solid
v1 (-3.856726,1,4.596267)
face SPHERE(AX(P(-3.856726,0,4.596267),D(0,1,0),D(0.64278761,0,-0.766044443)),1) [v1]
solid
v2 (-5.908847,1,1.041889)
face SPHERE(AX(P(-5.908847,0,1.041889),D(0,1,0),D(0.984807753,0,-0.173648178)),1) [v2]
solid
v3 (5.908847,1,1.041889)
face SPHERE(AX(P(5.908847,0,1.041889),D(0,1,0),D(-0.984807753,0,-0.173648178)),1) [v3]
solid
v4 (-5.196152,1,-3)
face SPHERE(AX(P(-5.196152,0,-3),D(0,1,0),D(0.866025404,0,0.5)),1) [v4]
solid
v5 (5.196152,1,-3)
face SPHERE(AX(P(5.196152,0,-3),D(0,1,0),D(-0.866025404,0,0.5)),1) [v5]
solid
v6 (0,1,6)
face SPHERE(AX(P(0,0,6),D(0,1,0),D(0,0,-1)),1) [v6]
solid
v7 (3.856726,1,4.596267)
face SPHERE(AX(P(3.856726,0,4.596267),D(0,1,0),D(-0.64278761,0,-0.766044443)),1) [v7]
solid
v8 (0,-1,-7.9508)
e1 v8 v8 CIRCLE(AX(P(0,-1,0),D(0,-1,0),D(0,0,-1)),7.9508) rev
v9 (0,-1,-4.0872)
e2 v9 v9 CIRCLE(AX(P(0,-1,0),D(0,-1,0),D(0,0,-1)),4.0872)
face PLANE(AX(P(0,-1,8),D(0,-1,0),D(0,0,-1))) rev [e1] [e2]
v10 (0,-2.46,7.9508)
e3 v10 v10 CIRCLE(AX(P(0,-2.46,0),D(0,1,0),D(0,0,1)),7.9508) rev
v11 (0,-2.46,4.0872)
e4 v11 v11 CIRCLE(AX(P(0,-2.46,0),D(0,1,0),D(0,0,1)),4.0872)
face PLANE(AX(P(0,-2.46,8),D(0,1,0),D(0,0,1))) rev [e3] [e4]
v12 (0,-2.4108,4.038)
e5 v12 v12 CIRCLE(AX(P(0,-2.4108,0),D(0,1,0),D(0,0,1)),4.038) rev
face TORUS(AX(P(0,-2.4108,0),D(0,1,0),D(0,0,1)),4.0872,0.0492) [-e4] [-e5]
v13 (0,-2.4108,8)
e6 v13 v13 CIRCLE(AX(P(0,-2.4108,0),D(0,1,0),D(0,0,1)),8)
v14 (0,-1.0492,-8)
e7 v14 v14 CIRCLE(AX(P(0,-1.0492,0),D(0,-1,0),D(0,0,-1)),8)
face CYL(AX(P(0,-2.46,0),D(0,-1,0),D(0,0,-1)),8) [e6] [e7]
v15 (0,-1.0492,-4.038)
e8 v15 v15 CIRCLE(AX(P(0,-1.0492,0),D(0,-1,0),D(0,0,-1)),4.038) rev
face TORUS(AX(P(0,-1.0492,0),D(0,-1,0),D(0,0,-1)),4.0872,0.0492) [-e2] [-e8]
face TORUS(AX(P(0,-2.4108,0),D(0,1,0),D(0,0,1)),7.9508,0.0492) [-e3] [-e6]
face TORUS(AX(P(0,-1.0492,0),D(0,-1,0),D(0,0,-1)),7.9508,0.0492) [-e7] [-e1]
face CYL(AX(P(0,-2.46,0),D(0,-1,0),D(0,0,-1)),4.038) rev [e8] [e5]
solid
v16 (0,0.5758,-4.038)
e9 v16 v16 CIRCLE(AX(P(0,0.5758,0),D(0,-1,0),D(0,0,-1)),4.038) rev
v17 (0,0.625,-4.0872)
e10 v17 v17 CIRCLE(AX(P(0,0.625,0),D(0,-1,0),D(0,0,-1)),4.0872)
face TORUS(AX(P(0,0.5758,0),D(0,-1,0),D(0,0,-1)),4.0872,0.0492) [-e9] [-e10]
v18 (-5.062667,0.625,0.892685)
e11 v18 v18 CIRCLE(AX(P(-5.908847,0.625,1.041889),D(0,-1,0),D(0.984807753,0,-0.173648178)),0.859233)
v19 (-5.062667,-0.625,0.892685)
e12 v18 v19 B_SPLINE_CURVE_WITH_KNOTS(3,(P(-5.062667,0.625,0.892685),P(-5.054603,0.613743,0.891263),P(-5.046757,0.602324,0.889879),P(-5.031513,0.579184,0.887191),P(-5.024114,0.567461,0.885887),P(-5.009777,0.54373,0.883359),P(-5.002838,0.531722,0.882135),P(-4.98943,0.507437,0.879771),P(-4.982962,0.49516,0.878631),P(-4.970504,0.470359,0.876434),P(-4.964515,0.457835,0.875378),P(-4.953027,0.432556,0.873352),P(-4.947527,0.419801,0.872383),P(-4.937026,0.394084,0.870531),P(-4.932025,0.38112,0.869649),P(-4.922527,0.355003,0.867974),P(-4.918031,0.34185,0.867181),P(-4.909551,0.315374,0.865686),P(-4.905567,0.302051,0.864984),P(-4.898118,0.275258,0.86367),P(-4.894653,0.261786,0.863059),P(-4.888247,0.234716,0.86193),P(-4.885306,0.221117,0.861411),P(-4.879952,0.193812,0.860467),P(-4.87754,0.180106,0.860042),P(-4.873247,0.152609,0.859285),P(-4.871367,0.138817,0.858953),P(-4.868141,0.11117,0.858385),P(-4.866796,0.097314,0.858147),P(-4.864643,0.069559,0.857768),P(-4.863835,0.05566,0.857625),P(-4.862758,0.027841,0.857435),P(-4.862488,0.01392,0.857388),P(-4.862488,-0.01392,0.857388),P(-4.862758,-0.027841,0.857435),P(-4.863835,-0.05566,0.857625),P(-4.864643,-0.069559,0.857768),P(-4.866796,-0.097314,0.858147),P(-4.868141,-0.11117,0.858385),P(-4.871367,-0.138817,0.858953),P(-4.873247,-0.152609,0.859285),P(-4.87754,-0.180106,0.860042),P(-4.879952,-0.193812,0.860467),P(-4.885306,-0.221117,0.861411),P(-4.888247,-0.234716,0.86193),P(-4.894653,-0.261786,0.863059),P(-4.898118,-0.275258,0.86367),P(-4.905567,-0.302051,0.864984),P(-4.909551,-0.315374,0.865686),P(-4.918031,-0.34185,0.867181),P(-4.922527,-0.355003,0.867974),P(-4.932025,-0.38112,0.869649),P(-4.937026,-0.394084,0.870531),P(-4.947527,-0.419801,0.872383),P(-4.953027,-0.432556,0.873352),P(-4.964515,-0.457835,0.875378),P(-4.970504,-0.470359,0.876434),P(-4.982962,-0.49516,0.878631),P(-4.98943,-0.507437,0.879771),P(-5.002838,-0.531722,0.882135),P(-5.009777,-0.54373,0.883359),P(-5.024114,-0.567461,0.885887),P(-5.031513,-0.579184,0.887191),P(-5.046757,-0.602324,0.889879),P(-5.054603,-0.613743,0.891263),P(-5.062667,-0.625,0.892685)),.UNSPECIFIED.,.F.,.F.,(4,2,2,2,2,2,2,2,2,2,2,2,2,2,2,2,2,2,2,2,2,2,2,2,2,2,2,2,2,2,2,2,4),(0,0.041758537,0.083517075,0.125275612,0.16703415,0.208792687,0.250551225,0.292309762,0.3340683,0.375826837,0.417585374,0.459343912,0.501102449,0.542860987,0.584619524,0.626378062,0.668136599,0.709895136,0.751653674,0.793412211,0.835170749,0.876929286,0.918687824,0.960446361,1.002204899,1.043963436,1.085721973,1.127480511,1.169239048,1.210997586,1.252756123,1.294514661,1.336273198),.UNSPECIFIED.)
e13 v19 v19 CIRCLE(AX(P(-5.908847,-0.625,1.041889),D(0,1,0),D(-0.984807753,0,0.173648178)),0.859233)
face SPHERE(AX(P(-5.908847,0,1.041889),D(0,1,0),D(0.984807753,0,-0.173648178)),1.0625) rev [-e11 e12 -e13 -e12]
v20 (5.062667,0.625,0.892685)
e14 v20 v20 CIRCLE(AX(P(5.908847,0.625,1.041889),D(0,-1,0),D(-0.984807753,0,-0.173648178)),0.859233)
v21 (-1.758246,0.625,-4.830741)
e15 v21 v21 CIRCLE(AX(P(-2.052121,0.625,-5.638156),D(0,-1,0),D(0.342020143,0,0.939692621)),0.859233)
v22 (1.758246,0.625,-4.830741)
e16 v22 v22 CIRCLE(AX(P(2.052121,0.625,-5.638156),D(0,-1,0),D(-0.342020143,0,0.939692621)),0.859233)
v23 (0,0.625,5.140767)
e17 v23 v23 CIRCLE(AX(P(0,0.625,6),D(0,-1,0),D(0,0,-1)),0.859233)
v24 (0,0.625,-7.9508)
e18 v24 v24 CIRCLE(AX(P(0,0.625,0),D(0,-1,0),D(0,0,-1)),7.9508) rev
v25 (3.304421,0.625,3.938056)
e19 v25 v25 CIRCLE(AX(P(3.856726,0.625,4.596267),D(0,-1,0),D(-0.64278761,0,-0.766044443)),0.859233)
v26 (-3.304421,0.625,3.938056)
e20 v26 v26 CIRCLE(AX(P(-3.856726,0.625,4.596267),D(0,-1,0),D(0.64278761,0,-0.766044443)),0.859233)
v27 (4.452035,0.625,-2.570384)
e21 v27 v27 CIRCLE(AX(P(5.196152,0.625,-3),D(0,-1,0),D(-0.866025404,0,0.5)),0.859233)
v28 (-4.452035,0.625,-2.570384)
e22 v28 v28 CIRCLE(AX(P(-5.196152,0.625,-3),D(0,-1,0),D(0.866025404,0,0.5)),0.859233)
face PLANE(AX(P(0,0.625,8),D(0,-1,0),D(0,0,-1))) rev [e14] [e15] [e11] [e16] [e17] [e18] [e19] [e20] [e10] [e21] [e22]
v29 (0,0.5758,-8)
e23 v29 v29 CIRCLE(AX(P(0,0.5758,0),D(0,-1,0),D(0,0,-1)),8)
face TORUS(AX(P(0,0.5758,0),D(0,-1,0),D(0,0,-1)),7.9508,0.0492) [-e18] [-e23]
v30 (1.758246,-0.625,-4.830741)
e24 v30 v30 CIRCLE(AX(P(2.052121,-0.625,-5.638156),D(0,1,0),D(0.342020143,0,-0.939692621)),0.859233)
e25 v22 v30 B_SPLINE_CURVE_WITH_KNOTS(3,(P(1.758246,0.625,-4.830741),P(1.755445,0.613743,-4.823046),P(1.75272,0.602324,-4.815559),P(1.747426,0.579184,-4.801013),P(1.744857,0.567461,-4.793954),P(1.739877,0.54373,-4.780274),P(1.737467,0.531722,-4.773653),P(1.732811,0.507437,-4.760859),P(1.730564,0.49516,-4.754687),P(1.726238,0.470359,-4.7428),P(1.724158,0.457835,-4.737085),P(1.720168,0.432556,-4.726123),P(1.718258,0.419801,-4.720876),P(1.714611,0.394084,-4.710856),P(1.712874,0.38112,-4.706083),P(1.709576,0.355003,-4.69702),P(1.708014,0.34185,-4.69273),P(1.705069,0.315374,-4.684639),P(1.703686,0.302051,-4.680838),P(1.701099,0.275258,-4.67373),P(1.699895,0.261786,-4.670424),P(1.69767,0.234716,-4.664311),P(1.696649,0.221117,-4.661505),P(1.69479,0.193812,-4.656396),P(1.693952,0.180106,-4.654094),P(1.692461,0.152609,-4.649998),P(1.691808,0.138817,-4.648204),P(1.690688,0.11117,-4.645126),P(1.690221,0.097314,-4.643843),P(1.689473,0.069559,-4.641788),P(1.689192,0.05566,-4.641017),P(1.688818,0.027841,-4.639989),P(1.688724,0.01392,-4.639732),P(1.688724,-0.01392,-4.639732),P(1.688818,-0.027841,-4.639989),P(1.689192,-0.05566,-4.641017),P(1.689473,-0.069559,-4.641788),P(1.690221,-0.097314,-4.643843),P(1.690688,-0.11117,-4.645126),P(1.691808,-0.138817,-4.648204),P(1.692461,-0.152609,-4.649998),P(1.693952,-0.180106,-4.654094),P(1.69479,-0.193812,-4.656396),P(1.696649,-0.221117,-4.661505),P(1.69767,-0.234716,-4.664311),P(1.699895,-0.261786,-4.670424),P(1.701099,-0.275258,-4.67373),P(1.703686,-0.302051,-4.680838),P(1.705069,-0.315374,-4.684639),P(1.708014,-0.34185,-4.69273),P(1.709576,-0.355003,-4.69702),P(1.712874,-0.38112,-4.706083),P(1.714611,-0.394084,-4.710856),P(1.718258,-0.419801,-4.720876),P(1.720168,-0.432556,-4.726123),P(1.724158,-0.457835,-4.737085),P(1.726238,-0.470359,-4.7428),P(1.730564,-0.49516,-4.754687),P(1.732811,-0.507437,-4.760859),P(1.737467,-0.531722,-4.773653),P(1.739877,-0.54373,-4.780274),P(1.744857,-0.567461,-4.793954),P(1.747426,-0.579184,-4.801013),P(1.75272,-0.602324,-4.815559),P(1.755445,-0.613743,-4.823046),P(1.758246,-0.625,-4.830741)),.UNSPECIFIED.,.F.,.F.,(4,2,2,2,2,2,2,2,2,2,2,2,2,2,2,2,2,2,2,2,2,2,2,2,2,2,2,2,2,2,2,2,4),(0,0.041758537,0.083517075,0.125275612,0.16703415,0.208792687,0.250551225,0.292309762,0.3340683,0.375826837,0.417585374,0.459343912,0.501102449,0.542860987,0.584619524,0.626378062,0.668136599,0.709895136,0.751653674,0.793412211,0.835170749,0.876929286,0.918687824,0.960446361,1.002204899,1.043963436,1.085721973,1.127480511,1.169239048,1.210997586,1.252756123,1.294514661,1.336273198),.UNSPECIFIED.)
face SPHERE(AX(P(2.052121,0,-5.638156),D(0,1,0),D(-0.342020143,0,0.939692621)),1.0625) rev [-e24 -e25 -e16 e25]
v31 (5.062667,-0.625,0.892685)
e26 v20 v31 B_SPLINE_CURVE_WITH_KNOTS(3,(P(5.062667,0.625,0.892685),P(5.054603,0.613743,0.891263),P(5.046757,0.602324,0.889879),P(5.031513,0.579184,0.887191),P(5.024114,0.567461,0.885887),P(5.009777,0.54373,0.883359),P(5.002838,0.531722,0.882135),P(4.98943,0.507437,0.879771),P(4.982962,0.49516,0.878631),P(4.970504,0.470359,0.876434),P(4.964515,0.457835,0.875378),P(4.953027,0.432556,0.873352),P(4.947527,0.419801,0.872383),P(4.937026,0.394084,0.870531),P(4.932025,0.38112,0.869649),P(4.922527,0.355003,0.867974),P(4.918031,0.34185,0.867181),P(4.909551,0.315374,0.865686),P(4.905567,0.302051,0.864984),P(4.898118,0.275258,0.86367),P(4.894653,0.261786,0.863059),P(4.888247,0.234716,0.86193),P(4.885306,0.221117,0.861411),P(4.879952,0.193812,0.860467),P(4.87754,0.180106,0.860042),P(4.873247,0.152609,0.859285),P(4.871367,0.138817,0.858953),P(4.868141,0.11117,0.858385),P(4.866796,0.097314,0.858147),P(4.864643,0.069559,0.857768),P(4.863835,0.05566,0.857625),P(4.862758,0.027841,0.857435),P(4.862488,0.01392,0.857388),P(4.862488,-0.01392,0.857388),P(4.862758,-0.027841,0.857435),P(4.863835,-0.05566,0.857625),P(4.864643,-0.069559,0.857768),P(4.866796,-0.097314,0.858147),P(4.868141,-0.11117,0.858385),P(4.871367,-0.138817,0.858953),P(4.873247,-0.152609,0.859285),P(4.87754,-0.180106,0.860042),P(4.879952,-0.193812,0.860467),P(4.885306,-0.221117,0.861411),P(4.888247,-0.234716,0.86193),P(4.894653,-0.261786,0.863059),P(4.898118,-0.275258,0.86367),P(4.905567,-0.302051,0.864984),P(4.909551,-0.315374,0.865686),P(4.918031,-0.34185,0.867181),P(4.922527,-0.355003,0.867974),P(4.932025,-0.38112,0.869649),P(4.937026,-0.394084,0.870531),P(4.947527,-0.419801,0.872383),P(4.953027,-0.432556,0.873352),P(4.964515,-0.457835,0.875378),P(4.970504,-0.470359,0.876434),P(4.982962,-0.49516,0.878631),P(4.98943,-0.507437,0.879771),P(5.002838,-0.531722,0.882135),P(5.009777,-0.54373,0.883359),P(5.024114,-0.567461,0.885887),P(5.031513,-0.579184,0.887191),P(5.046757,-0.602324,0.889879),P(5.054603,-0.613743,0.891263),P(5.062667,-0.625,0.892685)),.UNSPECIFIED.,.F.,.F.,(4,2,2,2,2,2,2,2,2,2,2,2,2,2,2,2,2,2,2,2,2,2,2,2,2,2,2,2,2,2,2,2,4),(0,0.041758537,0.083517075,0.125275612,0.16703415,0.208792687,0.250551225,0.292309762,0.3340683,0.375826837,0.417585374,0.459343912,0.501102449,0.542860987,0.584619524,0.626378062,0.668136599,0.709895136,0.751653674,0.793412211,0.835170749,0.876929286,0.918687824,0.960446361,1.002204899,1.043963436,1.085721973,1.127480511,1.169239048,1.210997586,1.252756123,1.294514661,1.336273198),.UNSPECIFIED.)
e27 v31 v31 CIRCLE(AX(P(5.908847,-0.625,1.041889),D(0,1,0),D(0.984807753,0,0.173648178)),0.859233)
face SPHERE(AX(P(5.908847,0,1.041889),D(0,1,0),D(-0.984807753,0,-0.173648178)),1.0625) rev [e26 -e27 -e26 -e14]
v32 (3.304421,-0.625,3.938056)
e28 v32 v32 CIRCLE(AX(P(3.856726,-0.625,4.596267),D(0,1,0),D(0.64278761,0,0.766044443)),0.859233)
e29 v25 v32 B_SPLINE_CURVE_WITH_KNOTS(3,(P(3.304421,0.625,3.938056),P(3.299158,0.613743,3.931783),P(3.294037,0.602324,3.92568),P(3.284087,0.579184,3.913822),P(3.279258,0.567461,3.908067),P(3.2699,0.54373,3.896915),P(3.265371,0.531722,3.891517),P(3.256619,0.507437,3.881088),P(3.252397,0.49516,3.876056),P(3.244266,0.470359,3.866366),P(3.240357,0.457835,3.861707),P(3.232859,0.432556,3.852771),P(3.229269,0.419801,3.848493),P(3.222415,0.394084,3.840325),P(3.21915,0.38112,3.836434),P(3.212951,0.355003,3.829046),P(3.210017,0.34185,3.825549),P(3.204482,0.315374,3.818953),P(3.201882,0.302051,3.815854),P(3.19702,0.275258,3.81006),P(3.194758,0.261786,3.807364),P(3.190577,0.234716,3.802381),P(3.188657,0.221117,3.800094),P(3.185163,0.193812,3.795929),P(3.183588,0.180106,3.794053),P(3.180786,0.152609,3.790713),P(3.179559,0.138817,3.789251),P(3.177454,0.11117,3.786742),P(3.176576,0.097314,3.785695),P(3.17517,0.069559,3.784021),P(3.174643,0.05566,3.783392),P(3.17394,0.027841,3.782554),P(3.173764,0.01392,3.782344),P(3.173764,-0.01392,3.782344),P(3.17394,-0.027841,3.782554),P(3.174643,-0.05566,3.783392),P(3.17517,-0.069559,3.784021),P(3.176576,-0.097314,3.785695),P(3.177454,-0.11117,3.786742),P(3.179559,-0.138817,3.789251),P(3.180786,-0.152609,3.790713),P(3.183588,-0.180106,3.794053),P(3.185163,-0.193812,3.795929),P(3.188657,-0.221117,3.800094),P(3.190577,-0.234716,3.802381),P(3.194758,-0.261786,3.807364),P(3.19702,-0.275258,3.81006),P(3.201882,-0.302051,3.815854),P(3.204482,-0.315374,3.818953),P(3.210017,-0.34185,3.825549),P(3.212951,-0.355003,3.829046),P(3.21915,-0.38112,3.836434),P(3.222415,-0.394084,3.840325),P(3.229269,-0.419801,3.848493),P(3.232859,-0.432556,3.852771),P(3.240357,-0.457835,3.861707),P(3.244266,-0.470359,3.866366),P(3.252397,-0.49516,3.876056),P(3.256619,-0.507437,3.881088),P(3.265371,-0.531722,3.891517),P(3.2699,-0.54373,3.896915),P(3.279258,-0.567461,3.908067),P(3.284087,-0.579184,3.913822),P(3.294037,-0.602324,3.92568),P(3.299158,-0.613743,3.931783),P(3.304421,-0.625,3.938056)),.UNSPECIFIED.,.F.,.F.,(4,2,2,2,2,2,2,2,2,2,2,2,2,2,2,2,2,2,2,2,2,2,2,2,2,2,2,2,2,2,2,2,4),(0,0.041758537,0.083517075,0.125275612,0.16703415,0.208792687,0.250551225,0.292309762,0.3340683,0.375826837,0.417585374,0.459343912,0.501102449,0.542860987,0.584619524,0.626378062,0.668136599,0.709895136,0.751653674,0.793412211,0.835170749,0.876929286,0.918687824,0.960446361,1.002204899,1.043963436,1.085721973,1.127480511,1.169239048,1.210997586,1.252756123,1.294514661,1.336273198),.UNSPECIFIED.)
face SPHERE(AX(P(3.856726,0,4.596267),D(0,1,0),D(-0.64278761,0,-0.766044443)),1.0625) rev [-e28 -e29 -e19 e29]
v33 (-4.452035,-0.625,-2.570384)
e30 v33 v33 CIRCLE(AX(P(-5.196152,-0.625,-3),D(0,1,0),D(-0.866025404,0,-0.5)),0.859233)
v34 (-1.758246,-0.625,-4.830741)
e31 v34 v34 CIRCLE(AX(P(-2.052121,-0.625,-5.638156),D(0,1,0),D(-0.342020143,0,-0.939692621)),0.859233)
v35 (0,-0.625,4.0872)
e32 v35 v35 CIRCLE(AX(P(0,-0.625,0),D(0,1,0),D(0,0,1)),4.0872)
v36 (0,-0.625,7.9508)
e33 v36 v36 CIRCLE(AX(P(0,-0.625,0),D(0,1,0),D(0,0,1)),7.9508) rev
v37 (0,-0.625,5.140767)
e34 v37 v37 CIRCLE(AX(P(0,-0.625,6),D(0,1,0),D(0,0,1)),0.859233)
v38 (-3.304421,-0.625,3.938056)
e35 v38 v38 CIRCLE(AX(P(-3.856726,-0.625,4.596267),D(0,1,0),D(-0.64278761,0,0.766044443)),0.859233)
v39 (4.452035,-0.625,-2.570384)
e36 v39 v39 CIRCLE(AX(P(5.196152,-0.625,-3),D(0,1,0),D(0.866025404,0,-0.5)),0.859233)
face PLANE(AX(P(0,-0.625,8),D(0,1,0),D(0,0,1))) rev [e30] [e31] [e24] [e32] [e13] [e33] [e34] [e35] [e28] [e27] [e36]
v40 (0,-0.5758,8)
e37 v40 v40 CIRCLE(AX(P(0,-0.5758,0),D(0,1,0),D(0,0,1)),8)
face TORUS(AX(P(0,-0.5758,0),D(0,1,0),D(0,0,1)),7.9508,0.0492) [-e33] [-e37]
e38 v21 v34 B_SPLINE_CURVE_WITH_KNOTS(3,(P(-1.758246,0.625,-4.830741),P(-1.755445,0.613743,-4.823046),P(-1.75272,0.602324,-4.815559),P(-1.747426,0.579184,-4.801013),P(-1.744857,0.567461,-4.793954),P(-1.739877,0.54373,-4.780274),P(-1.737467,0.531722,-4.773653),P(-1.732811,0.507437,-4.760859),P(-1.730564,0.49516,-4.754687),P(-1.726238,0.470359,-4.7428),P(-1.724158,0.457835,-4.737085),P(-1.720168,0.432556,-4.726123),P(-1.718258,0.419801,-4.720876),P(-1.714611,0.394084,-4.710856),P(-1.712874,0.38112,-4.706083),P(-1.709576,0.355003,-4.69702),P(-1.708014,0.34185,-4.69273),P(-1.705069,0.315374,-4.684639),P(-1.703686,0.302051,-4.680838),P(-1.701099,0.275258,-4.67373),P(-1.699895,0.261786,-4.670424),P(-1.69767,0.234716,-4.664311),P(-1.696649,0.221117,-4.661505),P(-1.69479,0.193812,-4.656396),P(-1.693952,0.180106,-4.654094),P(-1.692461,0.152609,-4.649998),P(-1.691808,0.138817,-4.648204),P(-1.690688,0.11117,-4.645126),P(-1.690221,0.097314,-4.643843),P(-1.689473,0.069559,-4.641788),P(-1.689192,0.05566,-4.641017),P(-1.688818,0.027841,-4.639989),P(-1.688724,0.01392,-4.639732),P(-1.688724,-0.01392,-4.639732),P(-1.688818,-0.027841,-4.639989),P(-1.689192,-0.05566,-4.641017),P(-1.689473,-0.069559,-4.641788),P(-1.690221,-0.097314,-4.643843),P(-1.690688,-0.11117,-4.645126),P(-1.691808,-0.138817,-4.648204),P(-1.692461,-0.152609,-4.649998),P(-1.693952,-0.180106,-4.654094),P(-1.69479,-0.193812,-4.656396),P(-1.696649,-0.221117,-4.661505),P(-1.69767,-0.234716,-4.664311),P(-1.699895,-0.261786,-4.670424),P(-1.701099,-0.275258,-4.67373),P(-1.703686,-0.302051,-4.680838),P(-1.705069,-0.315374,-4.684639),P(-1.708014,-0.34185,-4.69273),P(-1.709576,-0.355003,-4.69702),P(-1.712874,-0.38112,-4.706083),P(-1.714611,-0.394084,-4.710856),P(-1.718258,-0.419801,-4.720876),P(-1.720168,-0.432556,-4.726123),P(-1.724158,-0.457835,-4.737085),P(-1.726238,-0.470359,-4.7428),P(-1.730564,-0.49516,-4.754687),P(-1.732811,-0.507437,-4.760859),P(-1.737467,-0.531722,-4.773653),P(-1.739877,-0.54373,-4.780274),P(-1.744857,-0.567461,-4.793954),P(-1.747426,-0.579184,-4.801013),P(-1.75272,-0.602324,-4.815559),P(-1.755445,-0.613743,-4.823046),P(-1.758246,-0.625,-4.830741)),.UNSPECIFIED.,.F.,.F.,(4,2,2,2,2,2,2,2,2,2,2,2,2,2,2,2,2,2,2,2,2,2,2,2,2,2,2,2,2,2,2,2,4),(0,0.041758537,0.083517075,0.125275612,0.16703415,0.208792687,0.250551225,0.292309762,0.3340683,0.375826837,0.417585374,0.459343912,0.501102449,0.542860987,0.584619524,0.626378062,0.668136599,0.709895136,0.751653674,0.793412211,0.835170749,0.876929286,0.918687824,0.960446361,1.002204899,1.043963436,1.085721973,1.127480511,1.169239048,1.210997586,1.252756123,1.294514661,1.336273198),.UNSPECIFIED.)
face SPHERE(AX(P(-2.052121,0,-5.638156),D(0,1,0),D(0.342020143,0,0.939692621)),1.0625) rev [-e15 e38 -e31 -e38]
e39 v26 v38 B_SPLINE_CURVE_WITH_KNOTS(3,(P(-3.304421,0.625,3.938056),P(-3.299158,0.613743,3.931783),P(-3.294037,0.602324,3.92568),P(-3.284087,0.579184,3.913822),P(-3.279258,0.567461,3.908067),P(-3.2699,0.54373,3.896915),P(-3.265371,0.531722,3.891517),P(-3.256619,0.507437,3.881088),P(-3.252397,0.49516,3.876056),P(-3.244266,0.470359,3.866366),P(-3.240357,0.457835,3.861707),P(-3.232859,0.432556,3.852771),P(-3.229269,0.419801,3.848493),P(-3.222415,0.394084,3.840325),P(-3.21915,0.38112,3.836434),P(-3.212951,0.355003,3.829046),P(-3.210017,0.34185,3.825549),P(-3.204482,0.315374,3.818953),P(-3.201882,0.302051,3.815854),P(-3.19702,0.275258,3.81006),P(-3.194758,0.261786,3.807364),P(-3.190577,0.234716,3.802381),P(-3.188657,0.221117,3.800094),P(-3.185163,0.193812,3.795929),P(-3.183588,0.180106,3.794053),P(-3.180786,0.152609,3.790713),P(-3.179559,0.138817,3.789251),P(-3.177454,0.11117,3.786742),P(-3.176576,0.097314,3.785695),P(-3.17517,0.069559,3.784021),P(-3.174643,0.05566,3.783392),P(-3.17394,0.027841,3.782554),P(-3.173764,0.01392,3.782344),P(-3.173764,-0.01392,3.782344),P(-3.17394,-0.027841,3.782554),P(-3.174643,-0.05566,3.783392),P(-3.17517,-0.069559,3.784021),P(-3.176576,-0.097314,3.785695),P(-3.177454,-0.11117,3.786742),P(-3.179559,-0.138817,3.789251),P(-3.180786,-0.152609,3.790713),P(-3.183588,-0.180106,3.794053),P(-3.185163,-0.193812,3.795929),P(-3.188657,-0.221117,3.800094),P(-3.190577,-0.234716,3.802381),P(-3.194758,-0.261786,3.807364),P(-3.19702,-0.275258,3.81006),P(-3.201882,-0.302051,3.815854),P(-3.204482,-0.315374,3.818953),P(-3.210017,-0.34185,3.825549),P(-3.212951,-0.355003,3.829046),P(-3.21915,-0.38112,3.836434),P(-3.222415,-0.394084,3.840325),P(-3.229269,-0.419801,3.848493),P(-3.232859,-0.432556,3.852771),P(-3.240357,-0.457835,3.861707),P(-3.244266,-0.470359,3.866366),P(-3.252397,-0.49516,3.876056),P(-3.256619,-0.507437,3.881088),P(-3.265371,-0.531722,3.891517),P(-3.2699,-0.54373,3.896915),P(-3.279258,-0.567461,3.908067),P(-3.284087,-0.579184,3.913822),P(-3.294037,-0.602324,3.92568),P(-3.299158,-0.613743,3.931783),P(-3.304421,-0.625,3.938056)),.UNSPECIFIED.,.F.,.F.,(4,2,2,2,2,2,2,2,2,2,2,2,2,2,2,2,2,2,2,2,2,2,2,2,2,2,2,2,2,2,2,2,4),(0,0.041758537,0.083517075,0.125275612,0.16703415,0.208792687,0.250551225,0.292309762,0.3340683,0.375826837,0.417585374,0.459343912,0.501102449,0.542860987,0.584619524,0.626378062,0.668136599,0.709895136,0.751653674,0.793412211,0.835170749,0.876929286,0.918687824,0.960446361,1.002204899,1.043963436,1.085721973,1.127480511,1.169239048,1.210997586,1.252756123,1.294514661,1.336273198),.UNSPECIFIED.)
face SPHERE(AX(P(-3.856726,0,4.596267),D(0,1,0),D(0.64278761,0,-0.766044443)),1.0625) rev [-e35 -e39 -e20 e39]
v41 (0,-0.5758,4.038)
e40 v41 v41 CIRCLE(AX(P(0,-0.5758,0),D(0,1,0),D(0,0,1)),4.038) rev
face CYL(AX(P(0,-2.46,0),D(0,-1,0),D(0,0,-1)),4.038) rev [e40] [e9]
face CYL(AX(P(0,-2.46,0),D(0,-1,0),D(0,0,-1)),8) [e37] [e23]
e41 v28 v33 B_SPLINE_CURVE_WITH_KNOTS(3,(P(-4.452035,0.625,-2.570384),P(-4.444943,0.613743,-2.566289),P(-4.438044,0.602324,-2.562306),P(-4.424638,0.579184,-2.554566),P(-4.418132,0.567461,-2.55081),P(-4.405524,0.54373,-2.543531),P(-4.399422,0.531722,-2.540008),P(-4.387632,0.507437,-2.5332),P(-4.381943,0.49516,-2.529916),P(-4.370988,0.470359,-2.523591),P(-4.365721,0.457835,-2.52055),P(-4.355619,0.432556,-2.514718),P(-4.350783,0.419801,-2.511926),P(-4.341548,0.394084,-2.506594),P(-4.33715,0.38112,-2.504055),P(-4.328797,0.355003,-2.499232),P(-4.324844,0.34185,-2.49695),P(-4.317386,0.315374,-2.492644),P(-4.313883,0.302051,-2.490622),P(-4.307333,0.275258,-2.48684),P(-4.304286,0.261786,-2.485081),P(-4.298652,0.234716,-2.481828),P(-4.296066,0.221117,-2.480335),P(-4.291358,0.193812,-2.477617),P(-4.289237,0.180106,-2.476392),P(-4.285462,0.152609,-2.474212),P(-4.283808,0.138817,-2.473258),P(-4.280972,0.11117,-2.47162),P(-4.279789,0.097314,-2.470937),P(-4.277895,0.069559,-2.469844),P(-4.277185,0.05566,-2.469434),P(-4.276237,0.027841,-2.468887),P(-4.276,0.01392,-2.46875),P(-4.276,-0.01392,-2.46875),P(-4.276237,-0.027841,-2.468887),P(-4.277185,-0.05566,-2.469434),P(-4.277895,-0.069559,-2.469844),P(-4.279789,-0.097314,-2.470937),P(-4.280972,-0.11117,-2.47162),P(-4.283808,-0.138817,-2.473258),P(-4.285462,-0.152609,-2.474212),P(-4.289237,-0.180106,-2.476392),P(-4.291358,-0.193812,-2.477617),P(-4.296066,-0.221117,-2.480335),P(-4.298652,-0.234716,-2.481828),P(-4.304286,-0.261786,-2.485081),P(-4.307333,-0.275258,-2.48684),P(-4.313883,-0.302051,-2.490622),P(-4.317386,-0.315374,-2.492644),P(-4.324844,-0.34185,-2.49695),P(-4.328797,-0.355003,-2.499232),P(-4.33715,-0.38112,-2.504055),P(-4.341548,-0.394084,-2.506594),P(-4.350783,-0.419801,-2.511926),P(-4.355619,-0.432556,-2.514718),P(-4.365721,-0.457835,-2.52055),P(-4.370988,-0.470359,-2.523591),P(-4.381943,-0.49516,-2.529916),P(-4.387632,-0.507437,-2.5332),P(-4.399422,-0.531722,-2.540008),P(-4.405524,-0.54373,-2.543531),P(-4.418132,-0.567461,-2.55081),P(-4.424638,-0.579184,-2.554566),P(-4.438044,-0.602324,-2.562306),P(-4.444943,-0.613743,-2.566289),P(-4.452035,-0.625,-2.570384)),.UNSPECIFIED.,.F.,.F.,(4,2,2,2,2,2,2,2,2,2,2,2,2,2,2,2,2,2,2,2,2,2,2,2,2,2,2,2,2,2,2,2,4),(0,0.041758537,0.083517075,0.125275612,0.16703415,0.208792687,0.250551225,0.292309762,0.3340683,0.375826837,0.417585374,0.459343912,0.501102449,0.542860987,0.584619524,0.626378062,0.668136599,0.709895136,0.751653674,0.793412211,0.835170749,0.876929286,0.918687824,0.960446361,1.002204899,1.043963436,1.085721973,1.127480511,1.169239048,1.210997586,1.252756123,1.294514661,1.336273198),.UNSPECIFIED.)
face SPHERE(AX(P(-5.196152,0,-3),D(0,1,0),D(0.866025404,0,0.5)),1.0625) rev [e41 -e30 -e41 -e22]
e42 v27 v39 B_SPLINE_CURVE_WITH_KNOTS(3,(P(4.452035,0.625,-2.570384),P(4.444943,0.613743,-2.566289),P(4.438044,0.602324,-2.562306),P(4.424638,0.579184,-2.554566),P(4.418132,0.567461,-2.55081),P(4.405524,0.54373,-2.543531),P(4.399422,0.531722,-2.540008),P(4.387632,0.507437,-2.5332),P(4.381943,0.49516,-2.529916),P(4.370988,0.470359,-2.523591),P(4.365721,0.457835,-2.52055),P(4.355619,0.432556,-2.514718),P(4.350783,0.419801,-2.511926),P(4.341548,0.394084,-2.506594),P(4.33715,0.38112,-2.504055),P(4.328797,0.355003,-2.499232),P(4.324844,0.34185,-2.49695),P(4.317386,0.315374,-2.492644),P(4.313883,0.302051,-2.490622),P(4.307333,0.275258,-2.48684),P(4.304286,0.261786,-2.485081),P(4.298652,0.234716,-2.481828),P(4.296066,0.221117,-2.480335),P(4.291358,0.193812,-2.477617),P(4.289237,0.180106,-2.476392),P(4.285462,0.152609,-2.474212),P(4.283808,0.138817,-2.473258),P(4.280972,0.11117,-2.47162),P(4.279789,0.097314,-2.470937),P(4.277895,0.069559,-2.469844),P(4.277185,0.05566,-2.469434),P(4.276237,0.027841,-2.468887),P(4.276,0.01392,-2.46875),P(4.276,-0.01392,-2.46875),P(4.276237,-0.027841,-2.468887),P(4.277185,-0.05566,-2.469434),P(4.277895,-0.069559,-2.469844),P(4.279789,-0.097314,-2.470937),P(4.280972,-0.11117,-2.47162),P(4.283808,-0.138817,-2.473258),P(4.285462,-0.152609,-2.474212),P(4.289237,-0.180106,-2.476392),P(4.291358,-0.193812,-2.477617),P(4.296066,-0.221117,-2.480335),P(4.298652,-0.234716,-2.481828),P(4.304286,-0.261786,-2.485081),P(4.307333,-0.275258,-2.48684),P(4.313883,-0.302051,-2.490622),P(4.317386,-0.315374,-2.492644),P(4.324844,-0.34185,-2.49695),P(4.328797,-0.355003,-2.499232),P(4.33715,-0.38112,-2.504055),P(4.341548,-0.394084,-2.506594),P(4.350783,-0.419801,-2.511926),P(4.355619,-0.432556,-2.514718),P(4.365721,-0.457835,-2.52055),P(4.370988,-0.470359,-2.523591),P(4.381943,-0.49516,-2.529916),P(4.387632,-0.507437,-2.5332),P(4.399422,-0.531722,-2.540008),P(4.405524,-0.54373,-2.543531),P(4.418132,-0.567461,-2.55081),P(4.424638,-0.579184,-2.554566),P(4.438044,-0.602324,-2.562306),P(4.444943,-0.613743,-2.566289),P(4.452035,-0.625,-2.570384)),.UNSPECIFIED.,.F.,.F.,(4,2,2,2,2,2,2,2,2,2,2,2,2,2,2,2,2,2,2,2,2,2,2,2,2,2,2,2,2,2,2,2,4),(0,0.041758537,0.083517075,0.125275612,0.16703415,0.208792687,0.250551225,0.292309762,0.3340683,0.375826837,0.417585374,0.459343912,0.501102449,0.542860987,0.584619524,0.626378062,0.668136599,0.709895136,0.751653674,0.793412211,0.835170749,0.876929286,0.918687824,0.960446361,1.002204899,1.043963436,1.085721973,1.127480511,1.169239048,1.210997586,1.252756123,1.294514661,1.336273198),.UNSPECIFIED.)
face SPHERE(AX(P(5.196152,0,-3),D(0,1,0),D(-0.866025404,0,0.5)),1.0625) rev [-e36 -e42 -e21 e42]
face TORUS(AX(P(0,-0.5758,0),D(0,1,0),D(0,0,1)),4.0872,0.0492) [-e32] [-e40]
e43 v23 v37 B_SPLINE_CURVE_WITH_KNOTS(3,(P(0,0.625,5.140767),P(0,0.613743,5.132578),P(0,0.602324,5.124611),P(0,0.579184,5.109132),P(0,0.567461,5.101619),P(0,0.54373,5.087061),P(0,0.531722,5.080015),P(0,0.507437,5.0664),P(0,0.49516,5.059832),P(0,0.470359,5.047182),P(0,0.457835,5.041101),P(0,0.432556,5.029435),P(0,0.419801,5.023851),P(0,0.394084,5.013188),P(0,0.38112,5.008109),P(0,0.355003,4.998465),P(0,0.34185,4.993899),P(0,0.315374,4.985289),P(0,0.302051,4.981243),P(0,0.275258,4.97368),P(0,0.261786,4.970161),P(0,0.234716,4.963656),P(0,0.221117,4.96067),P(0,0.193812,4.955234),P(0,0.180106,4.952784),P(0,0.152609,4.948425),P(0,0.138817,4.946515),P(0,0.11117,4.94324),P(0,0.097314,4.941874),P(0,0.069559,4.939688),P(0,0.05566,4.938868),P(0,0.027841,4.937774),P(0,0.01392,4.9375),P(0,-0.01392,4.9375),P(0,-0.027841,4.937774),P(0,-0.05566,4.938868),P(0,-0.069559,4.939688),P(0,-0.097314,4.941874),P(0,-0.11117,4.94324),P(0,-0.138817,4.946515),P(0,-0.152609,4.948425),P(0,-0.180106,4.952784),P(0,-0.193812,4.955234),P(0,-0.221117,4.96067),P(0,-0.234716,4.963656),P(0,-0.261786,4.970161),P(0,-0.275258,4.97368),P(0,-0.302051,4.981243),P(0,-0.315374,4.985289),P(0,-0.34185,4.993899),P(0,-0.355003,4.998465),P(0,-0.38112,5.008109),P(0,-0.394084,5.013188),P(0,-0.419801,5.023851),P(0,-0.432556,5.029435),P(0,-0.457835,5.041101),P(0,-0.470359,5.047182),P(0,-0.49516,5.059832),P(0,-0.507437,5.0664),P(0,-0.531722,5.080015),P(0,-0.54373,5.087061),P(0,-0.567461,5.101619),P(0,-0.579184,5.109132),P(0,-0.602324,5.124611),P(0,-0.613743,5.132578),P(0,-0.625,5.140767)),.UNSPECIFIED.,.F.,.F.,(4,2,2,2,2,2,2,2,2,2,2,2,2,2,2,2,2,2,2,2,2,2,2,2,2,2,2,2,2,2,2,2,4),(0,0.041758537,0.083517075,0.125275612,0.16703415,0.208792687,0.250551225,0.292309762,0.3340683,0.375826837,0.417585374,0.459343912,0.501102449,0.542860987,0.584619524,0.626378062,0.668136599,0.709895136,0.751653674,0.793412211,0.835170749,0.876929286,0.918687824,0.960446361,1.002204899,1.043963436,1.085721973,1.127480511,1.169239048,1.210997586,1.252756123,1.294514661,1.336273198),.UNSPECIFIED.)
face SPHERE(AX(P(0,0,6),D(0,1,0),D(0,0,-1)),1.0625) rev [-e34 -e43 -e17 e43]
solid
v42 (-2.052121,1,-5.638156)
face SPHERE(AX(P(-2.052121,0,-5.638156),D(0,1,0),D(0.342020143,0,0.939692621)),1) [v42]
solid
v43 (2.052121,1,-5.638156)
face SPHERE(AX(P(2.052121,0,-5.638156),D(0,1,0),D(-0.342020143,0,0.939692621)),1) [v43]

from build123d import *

# Parameters (mm, degrees)
SKETCH1_W         = 3.962
SKETCH1_H         = 1.25
CIRPATTERN1_COUNT = 9
CIRPATTERN1_ANGLE = 320
CIRPATTERN2_COUNT = 9
SKETCH4_W         = 3.962
SKETCH4_H         = 1.46
FILLET1_R         = 0.0492
FILLET2_R         = 0.0492
FILLET3_R         = 0.0492


# Read off the part's stored shape, not the designer's step: Body-Delete/Keep 1
with BuildPart() as part:
    # Sketch1 → Revolve1 (revolve)
    with BuildSketch(Plane(origin=(0, 0, 0), x_dir=(0, 0, -1), z_dir=(1, 0, 0)), mode=Mode.PRIVATE) as revolve1_sk:
        with Locations((-6.019, 0)):
            Rectangle(SKETCH1_W, SKETCH1_H)
    revolve(revolve1_sk.sketch.rotate(Axis((0, -2.46, 0), (0, 1, 0)), 180), axis=Axis((0, -2.46, 0), (0, 1, 0)))

    # Sketch3 → Cut-Revolve1 (revolve, cut)
    with BuildSketch(Plane(origin=(0, 0, 0), x_dir=(0, 0, -1), z_dir=(1, 0, 0))):
        with BuildLine():
            Line((-6, 1.0625), (-6, -1.0625))
            ThreePointArc((-6, -1.0625), (-7.0625, 0), (-6, 1.0625))
        make_face()
    cut_revolve1 = revolve(axis=Axis((0, 1.0625, 6), (0, -1, 0)), mode=Mode.SUBTRACT)

    # CirPattern2: Cut-Revolve1 ×9 about axis
    cirpattern2_axis = Axis((0, 0, 0), (0, 1, 0))
    for i in range(1, CIRPATTERN2_COUNT):
        add(cut_revolve1.rotate(cirpattern2_axis, i * 360 / CIRPATTERN2_COUNT), mode=Mode.SUBTRACT)

    # Fillet2
    fillet2_edges = [part.edges().sort_by_distance(p)[0] for p in [
        (0, 0.625, 8),
        (0, 0.625, 4.038),
        (0, -0.625, 4.038),
        (0, -0.625, 8),
    ]]
    fillet(fillet2_edges, radius=FILLET2_R)


with BuildPart() as body_2:
    # Sketch2 → Revolve2 (revolve)
    with BuildSketch(Plane(origin=(0, 0, 0), x_dir=(0, 0, -1), z_dir=(1, 0, 0))):
        with BuildLine():
            Line((-6, 1), (-6, -1))
            ThreePointArc((-6, -1), (-7, 0), (-6, 1))
        make_face()
    revolve(axis=Axis((0, 1, 6), (0, -1, 0)))


with BuildPart() as cirpattern1_1:
    # CirPattern1: pattern copy
    add(body_2.part.rotate(Axis((0, 2.46, 0), (0, -1, 0)), 1 * CIRPATTERN1_ANGLE / (CIRPATTERN1_COUNT - 1)))


with BuildPart() as cirpattern1_2:
    # CirPattern1: pattern copy
    add(body_2.part.rotate(Axis((0, 2.46, 0), (0, -1, 0)), 2 * CIRPATTERN1_ANGLE / (CIRPATTERN1_COUNT - 1)))


with BuildPart() as cirpattern1_3:
    # CirPattern1: pattern copy
    add(body_2.part.rotate(Axis((0, 2.46, 0), (0, -1, 0)), 3 * CIRPATTERN1_ANGLE / (CIRPATTERN1_COUNT - 1)))


with BuildPart() as cirpattern1_4:
    # CirPattern1: pattern copy
    add(body_2.part.rotate(Axis((0, 2.46, 0), (0, -1, 0)), 4 * CIRPATTERN1_ANGLE / (CIRPATTERN1_COUNT - 1)))


with BuildPart() as cirpattern1_5:
    # CirPattern1: pattern copy
    add(body_2.part.rotate(Axis((0, 2.46, 0), (0, -1, 0)), 5 * CIRPATTERN1_ANGLE / (CIRPATTERN1_COUNT - 1)))


with BuildPart() as cirpattern1_6:
    # CirPattern1: pattern copy
    add(body_2.part.rotate(Axis((0, 2.46, 0), (0, -1, 0)), 6 * CIRPATTERN1_ANGLE / (CIRPATTERN1_COUNT - 1)))


with BuildPart() as cirpattern1_7:
    # CirPattern1: pattern copy
    add(body_2.part.rotate(Axis((0, 2.46, 0), (0, -1, 0)), 7 * CIRPATTERN1_ANGLE / (CIRPATTERN1_COUNT - 1)))


with BuildPart() as cirpattern1_8:
    # CirPattern1: pattern copy
    add(body_2.part.rotate(Axis((0, 2.46, 0), (0, -1, 0)), 8 * CIRPATTERN1_ANGLE / (CIRPATTERN1_COUNT - 1)))


with BuildPart() as body_11:
    # Sketch4 → Revolve3 (revolve)
    with BuildSketch(Plane(origin=(0, 0, 0), x_dir=(0, 0, -1), z_dir=(1, 0, 0)), mode=Mode.PRIVATE) as revolve3_sk:
        with Locations((-6.019, 1.73)):
            Rectangle(SKETCH4_W, SKETCH4_H)
        with Locations((-6.019, -1.73)):
            Rectangle(SKETCH4_W, SKETCH4_H)
    revolve(revolve3_sk.sketch.rotate(Axis((0, -2.46, 0), (0, 1, 0)), 180), axis=Axis((0, -2.46, 0), (0, 1, 0)))

    # Fillet1
    fillet1_edges = [body_11.edges().sort_by_distance(p)[0] for p in [
        (0, 1, 8),
        (0, 1, 4.038),
        (0, 2.46, 4.038),
        (0, 2.46, 8),
    ]]
    fillet(fillet1_edges, radius=FILLET1_R)

    # Fillet3
    fillet3_edges = [body_11.edges().sort_by_distance(p)[0] for p in [
        (0, -2.46, 8),
        (0, -2.46, 4.038),
        (0, -1, 4.038),
        (0, -1, 8),
    ]]
    fillet(fillet3_edges, radius=FILLET3_R)

    # Body-Delete/Keep 1 outline → Body-Delete/Keep 1 (revolve, cut)
    with BuildSketch(Plane.XY):
        with BuildLine():
            Line((8, 1.0492), (8, 2.4108))
            ThreePointArc((8, 2.4108), (7.985589654, 2.445589654), (7.9508, 2.46))
            Line((7.9508, 2.46), (4.0872, 2.46))
            ThreePointArc((4.0872, 2.46), (4.052410346, 2.445589654), (4.038, 2.4108))
            Line((4.038, 2.4108), (4.038, 1.0492))
            ThreePointArc((4.038, 1.0492), (4.052410346, 1.014410346), (4.0872, 1))
            Line((4.0872, 1), (7.9508, 1))
            ThreePointArc((7.9508, 1), (7.985589654, 1.014410346), (8, 1.0492))
        make_face()
    revolve(axis=Axis((0, 0, 0), (0, 1, 0)), mode=Mode.SUBTRACT)


solid = Compound([part.part, body_2.part, cirpattern1_1.part, cirpattern1_2.part, cirpattern1_3.part, cirpattern1_4.part, cirpattern1_5.part, cirpattern1_6.part, cirpattern1_7.part, cirpattern1_8.part, body_11.part])
